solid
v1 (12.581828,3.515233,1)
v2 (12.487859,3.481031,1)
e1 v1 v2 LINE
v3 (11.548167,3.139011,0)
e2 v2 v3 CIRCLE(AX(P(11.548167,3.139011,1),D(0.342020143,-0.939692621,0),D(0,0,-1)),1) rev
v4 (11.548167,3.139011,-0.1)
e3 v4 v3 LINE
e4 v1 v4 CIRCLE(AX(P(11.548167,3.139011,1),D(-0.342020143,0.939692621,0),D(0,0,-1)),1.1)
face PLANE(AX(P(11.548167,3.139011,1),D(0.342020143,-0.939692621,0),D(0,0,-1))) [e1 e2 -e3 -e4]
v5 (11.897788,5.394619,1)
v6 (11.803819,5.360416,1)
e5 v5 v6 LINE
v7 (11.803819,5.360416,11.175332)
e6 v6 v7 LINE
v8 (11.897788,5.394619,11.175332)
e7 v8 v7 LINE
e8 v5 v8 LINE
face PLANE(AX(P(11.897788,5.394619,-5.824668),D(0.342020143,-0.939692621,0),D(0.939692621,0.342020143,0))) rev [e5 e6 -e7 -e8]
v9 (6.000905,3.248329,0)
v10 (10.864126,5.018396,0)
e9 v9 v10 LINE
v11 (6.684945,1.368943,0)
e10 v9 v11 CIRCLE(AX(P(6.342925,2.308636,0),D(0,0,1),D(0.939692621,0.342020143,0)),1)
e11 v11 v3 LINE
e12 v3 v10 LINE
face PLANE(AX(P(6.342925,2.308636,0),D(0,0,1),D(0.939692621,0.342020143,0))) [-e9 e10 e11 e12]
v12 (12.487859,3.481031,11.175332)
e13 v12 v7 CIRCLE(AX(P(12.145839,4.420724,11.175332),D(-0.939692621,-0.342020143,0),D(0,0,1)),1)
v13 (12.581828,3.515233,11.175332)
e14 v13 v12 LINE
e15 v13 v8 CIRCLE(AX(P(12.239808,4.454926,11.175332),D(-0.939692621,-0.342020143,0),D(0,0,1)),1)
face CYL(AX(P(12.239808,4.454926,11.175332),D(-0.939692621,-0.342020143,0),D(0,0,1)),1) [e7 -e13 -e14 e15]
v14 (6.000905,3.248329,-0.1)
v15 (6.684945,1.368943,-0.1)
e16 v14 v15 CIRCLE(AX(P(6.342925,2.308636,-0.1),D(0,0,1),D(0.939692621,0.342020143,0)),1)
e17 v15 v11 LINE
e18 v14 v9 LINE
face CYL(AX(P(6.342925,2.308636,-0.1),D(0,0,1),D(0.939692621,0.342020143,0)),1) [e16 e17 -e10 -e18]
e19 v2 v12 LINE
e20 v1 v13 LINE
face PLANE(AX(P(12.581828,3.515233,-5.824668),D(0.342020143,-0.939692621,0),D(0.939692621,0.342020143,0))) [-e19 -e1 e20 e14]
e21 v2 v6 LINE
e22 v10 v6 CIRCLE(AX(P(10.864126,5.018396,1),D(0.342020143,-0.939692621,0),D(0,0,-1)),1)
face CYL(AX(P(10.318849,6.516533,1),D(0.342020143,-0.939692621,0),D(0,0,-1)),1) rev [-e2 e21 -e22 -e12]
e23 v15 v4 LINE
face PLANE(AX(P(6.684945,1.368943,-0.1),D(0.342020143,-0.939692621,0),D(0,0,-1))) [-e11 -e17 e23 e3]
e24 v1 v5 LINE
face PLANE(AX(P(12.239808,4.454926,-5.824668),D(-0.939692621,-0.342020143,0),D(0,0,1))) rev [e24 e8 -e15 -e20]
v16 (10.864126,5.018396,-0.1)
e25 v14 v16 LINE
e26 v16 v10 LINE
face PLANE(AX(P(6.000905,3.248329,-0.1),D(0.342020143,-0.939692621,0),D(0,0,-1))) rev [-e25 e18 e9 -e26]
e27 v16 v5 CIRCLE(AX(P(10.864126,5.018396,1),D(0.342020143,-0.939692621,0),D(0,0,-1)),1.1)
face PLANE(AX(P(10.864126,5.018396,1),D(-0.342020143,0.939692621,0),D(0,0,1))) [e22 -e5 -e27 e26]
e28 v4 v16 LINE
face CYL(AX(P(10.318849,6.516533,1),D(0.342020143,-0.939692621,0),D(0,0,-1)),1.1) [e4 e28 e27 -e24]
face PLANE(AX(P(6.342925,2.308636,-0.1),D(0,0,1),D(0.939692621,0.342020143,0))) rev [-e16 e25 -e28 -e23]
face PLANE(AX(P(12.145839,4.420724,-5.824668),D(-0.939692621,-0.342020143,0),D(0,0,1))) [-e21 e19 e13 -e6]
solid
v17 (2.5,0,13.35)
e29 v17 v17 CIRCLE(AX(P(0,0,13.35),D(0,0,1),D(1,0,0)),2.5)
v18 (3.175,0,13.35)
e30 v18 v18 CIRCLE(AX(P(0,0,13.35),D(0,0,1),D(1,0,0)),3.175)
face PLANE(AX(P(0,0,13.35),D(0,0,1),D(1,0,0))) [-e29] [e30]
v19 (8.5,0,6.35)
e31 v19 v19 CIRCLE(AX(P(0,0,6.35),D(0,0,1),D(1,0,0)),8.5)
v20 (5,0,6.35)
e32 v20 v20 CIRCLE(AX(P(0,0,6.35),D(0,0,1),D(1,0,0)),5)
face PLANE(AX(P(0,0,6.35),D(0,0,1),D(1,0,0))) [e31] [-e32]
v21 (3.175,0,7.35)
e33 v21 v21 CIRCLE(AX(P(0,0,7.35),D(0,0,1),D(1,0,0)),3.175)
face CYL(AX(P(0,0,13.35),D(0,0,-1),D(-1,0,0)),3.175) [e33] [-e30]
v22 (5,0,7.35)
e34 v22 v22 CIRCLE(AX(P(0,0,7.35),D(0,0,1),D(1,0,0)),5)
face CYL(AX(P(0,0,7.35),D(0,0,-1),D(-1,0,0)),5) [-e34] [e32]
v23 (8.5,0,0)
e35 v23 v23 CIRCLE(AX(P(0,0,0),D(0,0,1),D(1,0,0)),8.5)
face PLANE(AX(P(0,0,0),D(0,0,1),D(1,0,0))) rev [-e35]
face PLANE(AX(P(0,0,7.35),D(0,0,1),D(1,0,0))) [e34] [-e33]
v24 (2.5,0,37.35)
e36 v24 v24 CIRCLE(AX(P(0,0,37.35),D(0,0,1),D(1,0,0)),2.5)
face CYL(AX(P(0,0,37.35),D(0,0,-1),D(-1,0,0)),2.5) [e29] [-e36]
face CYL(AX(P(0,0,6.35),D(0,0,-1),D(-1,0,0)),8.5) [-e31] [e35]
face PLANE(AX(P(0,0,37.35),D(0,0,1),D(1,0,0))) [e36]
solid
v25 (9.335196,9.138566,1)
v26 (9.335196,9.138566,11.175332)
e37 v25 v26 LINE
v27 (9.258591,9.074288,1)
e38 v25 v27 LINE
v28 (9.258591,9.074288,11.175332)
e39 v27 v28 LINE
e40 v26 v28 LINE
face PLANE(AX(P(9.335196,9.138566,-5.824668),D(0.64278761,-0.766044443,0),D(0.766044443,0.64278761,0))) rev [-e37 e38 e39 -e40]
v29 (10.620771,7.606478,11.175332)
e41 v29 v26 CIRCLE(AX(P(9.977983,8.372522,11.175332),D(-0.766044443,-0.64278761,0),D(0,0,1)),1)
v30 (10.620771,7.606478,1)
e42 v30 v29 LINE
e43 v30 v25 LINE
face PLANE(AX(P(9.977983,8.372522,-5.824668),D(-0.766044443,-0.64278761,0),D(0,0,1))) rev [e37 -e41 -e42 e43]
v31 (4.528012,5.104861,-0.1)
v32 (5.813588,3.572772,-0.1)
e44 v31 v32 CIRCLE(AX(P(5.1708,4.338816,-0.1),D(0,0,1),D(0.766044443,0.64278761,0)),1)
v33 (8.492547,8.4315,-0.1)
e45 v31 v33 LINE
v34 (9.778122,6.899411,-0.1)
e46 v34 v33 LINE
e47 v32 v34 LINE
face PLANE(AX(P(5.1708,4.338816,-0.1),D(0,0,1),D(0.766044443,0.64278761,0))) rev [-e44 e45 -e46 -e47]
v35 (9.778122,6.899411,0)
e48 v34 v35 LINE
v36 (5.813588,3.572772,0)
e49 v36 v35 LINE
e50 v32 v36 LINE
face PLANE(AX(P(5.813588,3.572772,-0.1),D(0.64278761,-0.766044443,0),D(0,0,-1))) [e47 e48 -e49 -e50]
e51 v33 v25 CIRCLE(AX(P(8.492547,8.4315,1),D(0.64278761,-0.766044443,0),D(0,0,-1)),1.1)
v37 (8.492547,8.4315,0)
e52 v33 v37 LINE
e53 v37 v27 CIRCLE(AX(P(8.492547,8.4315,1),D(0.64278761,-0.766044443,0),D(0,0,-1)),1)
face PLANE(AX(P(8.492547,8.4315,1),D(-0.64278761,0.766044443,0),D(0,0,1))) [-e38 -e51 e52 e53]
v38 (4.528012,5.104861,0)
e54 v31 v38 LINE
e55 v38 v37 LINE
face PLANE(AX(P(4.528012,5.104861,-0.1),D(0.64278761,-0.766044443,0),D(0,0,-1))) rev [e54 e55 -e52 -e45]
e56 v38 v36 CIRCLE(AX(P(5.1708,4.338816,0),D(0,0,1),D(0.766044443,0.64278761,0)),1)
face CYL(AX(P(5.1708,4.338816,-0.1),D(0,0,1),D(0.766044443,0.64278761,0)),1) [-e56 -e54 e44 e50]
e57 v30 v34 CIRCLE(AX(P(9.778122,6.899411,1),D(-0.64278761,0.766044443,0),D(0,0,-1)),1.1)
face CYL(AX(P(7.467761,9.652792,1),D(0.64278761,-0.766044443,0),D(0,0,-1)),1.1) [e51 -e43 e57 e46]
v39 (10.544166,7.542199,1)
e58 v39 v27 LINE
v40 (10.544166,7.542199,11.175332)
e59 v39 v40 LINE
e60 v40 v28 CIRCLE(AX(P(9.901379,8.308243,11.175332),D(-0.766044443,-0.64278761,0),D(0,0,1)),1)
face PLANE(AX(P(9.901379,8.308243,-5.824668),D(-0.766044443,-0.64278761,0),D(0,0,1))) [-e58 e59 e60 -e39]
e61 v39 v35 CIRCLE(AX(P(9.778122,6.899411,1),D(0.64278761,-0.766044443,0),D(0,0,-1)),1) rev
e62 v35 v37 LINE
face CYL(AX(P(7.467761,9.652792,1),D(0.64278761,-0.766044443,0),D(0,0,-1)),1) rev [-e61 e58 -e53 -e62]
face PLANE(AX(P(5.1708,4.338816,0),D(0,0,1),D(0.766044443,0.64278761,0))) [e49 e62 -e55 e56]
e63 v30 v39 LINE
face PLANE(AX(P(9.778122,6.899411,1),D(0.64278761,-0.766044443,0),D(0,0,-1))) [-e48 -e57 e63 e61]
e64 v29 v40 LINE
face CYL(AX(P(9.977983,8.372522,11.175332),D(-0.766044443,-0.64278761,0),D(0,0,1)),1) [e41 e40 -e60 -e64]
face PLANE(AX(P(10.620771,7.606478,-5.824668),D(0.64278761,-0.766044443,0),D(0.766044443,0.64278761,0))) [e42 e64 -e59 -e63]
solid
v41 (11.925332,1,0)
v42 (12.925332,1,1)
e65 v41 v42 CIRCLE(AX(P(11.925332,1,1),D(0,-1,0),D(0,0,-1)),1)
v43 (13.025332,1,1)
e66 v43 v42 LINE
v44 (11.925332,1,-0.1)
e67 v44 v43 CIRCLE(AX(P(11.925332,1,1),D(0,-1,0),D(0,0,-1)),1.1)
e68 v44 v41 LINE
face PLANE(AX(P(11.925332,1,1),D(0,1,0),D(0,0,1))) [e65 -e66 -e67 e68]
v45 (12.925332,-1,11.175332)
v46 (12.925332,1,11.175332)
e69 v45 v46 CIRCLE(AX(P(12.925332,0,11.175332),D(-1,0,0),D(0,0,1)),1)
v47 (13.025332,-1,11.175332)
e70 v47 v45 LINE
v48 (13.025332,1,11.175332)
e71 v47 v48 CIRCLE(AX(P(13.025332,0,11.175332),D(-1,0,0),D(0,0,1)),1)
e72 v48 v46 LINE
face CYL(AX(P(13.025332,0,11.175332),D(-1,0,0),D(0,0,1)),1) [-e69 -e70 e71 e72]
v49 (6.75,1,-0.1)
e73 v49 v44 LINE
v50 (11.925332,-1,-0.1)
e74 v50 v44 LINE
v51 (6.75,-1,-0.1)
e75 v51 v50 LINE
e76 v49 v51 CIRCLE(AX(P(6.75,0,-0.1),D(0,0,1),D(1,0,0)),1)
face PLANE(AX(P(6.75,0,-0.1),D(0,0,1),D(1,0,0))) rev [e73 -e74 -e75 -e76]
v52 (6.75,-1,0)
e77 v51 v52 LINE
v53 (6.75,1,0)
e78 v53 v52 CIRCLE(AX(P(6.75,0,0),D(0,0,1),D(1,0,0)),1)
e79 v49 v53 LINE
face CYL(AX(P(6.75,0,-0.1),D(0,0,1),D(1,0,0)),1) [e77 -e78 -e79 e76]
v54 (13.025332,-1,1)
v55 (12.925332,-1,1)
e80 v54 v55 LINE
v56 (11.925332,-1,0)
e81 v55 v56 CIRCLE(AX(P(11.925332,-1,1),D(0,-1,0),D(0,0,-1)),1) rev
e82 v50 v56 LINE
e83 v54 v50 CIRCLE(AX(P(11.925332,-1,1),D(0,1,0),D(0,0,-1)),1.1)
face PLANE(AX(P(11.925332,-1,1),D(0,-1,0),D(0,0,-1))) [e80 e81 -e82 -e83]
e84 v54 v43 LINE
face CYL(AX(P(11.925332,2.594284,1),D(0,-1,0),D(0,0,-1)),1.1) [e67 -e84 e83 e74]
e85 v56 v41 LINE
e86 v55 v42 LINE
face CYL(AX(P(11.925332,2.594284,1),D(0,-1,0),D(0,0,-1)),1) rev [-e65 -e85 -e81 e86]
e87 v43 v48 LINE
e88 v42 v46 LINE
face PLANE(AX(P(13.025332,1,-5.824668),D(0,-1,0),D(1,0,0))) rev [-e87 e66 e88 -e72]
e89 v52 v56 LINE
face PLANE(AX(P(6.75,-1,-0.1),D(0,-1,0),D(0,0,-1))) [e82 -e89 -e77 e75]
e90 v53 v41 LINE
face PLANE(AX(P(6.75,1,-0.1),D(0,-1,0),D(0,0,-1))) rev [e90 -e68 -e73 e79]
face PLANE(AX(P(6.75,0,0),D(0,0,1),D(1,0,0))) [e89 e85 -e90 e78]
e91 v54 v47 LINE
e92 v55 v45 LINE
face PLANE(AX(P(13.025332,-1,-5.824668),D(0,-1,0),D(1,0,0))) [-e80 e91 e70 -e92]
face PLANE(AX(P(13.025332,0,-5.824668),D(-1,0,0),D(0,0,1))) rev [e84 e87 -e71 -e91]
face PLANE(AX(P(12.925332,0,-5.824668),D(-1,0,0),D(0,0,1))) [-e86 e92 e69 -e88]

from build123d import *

# Parameters (mm, degrees)
SKETCH1_R                = 8.5
BOSS_EXTRUDE1_DEPTH      = 6.35
SKETCH2_R                = 5
BOSS_EXTRUDE2_DEPTH      = 1
SKETCH3_R                = 3.175
BOSS_EXTRUDE3_DEPTH      = 6
SKETCH4_R                = 2.5
BOSS_EXTRUDE4_DEPTH      = 24
BASE_FLANGE1_START       = -0.1
BASE_FLANGE1_DEPTH       = 0.1
SKETCHED_START           = 12.925331928
SKETCHED_BEND6_OUTLINE_W = 2
SKETCHED_BEND6_OUTLINE_H = 0.1
SKETCHED_BEND6_DEPTH     = 13.074668072
SKETCHED_START_2         = 11.925331928
SKETCHED_BEND6_2_DEPTH   = 1.1
SKETCHED_START_3         = -1
SKETCHED_BEND6_3_DEPTH   = 2
CIRPATTERN1_COUNT        = 3
CIRPATTERN1_ANGLE        = 40


with BuildPart() as part:
    # Sketch1 → Boss-Extrude1 (new body)
    with BuildSketch(Plane.XY):
        Circle(SKETCH1_R)
    extrude(amount=BOSS_EXTRUDE1_DEPTH)

    # Sketch2 → Boss-Extrude2 (add)
    with BuildSketch(Plane.XY.offset(6.35)):
        Circle(SKETCH2_R)
    extrude(amount=BOSS_EXTRUDE2_DEPTH)

    # Sketch3 → Boss-Extrude3 (add)
    with BuildSketch(Plane.XY.offset(7.35)):
        Circle(SKETCH3_R)
    extrude(amount=BOSS_EXTRUDE3_DEPTH)

    # Sketch4 → Boss-Extrude4 (add)
    with BuildSketch(Plane.XY.offset(13.35)):
        Circle(SKETCH4_R)
    extrude(amount=BOSS_EXTRUDE4_DEPTH)


with BuildPart() as body_2:
    # Base-Flange1: read off the stored shape, not the designer's step
    # Base-Flange1 outline → Base-Flange1 (new body)
    with BuildSketch(Plane.XY.offset(BASE_FLANGE1_START)):
        with BuildLine():
            Line((23.75, 1), (6.75, 1))
            ThreePointArc((6.75, 1), (5.75, 0), (6.75, -1))
            Line((6.75, -1), (23.75, -1))
            ThreePointArc((23.75, -1), (24.75, 0), (23.75, 1))
        make_face()
    extrude(amount=BASE_FLANGE1_DEPTH)

    # Sketched Bend6: read off the stored shape, not the designer's step
    # Sketched Bend6 outline → Sketched Bend6 (cut)
    with BuildSketch(Plane.YZ.offset(SKETCHED_START)):
        with Locations((0, -0.05)):
            Rectangle(SKETCHED_BEND6_OUTLINE_W, SKETCHED_BEND6_OUTLINE_H)
    extrude(amount=SKETCHED_BEND6_DEPTH, mode=Mode.SUBTRACT)

    # Sketched Bend6 2 outline → Sketched Bend6 2 (add)
    with BuildSketch(Plane.YZ.offset(SKETCHED_START_2)):
        with BuildLine():
            Line((1, 0), (1, 11.175331928))
            ThreePointArc((1, 11.175331928), (0, 12.175331928), (-1, 11.175331928))
            Line((-1, 11.175331928), (-1, 0))
            Line((-1, 0), (1, 0))
        make_face()
    extrude(amount=SKETCHED_BEND6_2_DEPTH)

    # Sketched Bend6 3 outline → Sketched Bend6 3 (cut)
    with BuildSketch(Plane(origin=(0, 0, 0), x_dir=(1, 0, 0), z_dir=(0, 1, 0)).offset(SKETCHED_START_3)):
        with BuildLine():
            Line((12.925331928, -14), (12.925331928, -1))
            ThreePointArc((12.925331928, -1), (12.63243871, -0.292893218), (11.925331928, 0))
            Line((11.925331928, 0), (11.925331928, -14))
            Line((11.925331928, -14), (12.925331928, -14))
        make_face()
        with BuildLine():
            Line((13.025331928, -1), (13.02533192, -14))
            Line((13.02533192, -14), (15, -14))
            Line((15, -14), (15, 0))
            Line((15, 0), (12.925331928, 0))
            Line((12.925331928, 0), (12.925331928, 0.1))
            Line((12.925331928, 0.1), (11.925331928, 0.1))
            ThreePointArc((11.925331928, 0.1), (12.703149387, -0.222182541), (13.025331928, -1))
        make_face()
    extrude(amount=SKETCHED_BEND6_3_DEPTH, mode=Mode.SUBTRACT)


with BuildPart() as cirpattern1_1:
    # CirPattern1: pattern copy
    add(body_2.part.rotate(Axis((0, 0, 0), (0, 0, 1)), 1 * CIRPATTERN1_ANGLE / (CIRPATTERN1_COUNT - 1)))


with BuildPart() as cirpattern1_2:
    # CirPattern1: pattern copy
    add(body_2.part.rotate(Axis((0, 0, 0), (0, 0, 1)), 2 * CIRPATTERN1_ANGLE / (CIRPATTERN1_COUNT - 1)))


solid = Compound([part.part, body_2.part, cirpattern1_1.part, cirpattern1_2.part])
